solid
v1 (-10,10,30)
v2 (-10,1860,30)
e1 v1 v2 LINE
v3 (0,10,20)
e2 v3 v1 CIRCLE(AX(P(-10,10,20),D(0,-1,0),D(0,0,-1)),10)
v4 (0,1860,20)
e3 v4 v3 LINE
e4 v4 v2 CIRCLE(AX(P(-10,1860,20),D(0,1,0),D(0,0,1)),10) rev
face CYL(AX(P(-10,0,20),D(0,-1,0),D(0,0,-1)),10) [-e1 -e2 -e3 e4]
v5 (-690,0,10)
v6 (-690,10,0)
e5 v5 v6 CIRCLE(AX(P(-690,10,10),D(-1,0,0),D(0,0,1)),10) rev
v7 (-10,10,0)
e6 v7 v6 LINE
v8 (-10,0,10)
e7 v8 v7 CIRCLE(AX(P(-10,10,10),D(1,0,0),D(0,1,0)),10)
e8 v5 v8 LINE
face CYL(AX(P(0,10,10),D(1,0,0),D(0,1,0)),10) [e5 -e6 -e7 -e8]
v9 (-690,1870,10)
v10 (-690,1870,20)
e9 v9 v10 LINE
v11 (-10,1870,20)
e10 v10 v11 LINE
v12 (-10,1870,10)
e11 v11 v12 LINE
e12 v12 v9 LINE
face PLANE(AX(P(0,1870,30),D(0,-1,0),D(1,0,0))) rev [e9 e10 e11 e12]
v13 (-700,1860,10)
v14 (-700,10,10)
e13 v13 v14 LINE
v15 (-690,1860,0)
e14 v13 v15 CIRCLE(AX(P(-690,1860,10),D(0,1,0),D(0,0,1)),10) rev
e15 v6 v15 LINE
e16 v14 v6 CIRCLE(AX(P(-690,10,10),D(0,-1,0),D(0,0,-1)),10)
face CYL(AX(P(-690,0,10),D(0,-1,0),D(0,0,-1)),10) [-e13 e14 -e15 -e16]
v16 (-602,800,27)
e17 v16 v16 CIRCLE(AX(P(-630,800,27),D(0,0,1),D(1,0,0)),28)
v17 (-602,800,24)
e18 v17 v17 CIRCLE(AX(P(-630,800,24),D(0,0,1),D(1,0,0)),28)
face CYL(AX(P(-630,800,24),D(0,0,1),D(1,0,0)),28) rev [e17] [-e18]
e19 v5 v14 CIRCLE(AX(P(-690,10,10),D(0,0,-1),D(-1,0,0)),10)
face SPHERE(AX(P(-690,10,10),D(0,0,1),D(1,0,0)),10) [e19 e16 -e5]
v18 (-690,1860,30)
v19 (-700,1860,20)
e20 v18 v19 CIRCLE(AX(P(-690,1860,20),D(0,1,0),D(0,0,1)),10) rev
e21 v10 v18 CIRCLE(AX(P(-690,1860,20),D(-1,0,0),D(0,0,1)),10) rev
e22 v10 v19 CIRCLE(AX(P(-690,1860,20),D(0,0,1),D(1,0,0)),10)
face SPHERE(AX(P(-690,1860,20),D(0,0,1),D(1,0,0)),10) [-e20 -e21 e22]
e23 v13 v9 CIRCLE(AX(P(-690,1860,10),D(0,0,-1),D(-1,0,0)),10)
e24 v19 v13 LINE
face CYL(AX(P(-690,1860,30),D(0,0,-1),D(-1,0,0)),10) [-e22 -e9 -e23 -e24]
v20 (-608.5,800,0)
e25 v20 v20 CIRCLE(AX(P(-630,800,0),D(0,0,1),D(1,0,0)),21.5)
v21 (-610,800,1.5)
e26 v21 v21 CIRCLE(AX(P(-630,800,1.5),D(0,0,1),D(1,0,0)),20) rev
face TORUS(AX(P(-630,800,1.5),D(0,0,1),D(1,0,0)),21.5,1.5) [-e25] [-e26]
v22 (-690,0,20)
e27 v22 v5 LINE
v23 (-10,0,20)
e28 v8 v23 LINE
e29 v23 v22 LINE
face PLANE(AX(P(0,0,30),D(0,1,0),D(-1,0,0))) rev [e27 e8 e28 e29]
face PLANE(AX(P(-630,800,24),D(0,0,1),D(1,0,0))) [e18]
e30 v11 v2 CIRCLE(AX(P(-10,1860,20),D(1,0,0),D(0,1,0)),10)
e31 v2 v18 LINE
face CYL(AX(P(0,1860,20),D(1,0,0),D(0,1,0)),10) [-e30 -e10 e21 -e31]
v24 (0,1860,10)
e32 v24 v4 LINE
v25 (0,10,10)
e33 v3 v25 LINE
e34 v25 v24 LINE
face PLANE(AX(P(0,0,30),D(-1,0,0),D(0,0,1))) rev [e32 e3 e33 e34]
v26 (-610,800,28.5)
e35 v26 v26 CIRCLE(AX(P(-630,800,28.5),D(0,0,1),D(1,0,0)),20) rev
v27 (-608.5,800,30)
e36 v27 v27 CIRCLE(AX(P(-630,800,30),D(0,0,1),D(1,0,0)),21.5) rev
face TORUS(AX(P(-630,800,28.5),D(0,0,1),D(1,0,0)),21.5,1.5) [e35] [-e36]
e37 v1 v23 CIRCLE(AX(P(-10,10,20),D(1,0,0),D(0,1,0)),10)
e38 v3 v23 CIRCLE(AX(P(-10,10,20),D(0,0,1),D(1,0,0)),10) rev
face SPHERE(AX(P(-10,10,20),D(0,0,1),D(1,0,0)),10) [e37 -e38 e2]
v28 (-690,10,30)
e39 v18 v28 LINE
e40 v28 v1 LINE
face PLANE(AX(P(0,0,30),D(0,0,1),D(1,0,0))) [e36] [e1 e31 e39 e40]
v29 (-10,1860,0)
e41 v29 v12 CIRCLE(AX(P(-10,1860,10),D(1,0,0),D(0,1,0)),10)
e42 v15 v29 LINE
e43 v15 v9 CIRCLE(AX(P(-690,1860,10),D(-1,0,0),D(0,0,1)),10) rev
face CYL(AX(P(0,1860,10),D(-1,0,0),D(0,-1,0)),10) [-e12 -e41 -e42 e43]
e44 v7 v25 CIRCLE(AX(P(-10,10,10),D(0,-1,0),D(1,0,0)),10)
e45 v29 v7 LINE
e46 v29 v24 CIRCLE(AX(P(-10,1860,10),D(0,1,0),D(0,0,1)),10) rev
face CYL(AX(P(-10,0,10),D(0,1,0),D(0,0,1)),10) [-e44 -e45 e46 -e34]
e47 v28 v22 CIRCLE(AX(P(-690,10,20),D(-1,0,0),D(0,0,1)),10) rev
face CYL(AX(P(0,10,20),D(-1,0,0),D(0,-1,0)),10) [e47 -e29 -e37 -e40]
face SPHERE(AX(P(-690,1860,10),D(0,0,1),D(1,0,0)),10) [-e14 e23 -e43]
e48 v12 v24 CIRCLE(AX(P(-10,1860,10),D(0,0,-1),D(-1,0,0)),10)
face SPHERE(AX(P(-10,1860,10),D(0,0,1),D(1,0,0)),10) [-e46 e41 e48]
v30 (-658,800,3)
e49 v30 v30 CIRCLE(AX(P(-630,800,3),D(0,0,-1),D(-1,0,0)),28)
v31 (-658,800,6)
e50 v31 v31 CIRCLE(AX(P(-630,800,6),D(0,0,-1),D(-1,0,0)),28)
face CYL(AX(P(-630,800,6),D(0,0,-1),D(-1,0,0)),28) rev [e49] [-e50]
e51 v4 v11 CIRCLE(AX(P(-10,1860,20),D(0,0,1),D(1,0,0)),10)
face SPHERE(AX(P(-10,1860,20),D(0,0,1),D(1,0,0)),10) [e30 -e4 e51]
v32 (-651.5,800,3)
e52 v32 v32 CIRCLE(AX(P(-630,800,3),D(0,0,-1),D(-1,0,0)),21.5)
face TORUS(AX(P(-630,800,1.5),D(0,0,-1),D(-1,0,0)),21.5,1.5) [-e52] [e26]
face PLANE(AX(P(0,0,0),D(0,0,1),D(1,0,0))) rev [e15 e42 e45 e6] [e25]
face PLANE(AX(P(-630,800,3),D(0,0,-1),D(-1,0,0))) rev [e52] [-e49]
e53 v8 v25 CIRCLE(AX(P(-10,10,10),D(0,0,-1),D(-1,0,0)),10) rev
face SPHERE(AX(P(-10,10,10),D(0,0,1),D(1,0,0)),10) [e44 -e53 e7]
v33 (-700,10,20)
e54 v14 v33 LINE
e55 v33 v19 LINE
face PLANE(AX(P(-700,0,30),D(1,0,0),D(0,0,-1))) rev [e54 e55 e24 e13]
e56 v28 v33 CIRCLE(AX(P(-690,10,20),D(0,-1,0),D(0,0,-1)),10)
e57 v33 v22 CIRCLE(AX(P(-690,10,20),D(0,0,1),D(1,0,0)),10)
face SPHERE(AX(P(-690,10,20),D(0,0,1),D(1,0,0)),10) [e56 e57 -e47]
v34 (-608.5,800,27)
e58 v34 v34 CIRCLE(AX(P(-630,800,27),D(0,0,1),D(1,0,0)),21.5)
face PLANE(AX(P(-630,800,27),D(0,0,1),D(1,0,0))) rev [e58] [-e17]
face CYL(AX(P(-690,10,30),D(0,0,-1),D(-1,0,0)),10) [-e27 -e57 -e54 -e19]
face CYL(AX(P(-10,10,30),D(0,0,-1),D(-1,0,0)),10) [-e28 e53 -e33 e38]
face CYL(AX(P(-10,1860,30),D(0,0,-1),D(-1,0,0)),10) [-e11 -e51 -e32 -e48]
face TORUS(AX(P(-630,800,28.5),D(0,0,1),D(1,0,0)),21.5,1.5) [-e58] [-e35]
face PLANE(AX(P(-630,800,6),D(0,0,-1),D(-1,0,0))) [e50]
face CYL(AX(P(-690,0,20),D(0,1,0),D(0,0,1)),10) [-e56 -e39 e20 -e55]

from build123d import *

# Parameters (mm, degrees)
SKETCH1_W           = 700
SKETCH1_H           = 1870
BOSS_EXTRUDE1_DEPTH = 30
SKETCH2_R           = 20
CUT_EXTRUDE1_DEPTH  = 3
SKETCH3_R           = 28
CUT_EXTRUDE2_DEPTH  = 3
FILLET1_R           = 1.5
CUT_EXTRUDE3_START  = -3
SKETCH5_R           = 20
CUT_EXTRUDE3_DEPTH  = 3
CUT_EXTRUDE4_START  = -3
SKETCH6_R           = 28
CUT_EXTRUDE4_DEPTH  = 3
FILLET2_R           = 1.5
FILLET3_R           = 10


with BuildPart() as part:
    # Sketch1 → Boss-Extrude1 (new body)
    with BuildSketch(Plane.XY):
        with Locations((-350, 935)):
            Rectangle(SKETCH1_W, SKETCH1_H)
    extrude(amount=BOSS_EXTRUDE1_DEPTH)

    # Sketch2 → Cut-Extrude1 (cut)
    with BuildSketch(Plane.XY.offset(30)):
        with Locations((-630, 800)):
            Circle(SKETCH2_R)
    extrude(amount=-CUT_EXTRUDE1_DEPTH, mode=Mode.SUBTRACT)

    # Sketch3 → Cut-Extrude2 (cut)
    with BuildSketch(Plane.XY.offset(27)):
        with Locations((-630, 800)):
            Circle(SKETCH3_R)
    extrude(amount=-CUT_EXTRUDE2_DEPTH, mode=Mode.SUBTRACT)

    # Fillet1
    fillet1_edges = [part.edges().sort_by_distance(p)[0] for p in [
        (-650, 800, 30),
        (-650, 800, 27),
    ]]
    fillet(fillet1_edges, radius=FILLET1_R - 0.0001)  # a hair under: the kernel refuses the full size

    # Sketch5 → Cut-Extrude3 (cut)
    with BuildSketch(Plane(origin=(0, 0, 0), x_dir=(-1, 0, 0), z_dir=(0, 0, -1)).offset(CUT_EXTRUDE3_START)):
        with Locations((630, 800)):
            Circle(SKETCH5_R)
    extrude(amount=CUT_EXTRUDE3_DEPTH, mode=Mode.SUBTRACT)

    # Sketch6 → Cut-Extrude4 (cut)
    with BuildSketch(Plane(origin=(0, 0, 3), x_dir=(-1, 0, 0), z_dir=(0, 0, -1)).offset(CUT_EXTRUDE4_START)):
        with Locations(Location((630, 800, 0), (0, 0, 180))):
            Circle(SKETCH6_R)
    extrude(amount=CUT_EXTRUDE4_DEPTH, mode=Mode.SUBTRACT)

    # Fillet2
    fillet2_edges = [part.edges().sort_by_distance(p)[0] for p in [
        (-610, 800, 0),
        (-610, 800, 3),
    ]]
    fillet(fillet2_edges, radius=FILLET2_R - 0.0001)  # a hair under: the kernel refuses the full size

    # Fillet3
    fillet3_edges = [part.edges().sort_by_distance(p)[0] for p in [
        (-700, 935, 30),
        (-350, 0, 30),
        (0, 935, 30),
        (-350, 0, 0),
        (-700, 935, 0),
        (-350, 1870, 0),
        (0, 935, 0),
        (0, 0, 15),
        (-700, 0, 15),
        (-700, 1870, 15),
        (0, 1870, 15),
        (-350, 1870, 30),
    ]]
    fillet(fillet3_edges, radius=FILLET3_R)


solid = part.part
